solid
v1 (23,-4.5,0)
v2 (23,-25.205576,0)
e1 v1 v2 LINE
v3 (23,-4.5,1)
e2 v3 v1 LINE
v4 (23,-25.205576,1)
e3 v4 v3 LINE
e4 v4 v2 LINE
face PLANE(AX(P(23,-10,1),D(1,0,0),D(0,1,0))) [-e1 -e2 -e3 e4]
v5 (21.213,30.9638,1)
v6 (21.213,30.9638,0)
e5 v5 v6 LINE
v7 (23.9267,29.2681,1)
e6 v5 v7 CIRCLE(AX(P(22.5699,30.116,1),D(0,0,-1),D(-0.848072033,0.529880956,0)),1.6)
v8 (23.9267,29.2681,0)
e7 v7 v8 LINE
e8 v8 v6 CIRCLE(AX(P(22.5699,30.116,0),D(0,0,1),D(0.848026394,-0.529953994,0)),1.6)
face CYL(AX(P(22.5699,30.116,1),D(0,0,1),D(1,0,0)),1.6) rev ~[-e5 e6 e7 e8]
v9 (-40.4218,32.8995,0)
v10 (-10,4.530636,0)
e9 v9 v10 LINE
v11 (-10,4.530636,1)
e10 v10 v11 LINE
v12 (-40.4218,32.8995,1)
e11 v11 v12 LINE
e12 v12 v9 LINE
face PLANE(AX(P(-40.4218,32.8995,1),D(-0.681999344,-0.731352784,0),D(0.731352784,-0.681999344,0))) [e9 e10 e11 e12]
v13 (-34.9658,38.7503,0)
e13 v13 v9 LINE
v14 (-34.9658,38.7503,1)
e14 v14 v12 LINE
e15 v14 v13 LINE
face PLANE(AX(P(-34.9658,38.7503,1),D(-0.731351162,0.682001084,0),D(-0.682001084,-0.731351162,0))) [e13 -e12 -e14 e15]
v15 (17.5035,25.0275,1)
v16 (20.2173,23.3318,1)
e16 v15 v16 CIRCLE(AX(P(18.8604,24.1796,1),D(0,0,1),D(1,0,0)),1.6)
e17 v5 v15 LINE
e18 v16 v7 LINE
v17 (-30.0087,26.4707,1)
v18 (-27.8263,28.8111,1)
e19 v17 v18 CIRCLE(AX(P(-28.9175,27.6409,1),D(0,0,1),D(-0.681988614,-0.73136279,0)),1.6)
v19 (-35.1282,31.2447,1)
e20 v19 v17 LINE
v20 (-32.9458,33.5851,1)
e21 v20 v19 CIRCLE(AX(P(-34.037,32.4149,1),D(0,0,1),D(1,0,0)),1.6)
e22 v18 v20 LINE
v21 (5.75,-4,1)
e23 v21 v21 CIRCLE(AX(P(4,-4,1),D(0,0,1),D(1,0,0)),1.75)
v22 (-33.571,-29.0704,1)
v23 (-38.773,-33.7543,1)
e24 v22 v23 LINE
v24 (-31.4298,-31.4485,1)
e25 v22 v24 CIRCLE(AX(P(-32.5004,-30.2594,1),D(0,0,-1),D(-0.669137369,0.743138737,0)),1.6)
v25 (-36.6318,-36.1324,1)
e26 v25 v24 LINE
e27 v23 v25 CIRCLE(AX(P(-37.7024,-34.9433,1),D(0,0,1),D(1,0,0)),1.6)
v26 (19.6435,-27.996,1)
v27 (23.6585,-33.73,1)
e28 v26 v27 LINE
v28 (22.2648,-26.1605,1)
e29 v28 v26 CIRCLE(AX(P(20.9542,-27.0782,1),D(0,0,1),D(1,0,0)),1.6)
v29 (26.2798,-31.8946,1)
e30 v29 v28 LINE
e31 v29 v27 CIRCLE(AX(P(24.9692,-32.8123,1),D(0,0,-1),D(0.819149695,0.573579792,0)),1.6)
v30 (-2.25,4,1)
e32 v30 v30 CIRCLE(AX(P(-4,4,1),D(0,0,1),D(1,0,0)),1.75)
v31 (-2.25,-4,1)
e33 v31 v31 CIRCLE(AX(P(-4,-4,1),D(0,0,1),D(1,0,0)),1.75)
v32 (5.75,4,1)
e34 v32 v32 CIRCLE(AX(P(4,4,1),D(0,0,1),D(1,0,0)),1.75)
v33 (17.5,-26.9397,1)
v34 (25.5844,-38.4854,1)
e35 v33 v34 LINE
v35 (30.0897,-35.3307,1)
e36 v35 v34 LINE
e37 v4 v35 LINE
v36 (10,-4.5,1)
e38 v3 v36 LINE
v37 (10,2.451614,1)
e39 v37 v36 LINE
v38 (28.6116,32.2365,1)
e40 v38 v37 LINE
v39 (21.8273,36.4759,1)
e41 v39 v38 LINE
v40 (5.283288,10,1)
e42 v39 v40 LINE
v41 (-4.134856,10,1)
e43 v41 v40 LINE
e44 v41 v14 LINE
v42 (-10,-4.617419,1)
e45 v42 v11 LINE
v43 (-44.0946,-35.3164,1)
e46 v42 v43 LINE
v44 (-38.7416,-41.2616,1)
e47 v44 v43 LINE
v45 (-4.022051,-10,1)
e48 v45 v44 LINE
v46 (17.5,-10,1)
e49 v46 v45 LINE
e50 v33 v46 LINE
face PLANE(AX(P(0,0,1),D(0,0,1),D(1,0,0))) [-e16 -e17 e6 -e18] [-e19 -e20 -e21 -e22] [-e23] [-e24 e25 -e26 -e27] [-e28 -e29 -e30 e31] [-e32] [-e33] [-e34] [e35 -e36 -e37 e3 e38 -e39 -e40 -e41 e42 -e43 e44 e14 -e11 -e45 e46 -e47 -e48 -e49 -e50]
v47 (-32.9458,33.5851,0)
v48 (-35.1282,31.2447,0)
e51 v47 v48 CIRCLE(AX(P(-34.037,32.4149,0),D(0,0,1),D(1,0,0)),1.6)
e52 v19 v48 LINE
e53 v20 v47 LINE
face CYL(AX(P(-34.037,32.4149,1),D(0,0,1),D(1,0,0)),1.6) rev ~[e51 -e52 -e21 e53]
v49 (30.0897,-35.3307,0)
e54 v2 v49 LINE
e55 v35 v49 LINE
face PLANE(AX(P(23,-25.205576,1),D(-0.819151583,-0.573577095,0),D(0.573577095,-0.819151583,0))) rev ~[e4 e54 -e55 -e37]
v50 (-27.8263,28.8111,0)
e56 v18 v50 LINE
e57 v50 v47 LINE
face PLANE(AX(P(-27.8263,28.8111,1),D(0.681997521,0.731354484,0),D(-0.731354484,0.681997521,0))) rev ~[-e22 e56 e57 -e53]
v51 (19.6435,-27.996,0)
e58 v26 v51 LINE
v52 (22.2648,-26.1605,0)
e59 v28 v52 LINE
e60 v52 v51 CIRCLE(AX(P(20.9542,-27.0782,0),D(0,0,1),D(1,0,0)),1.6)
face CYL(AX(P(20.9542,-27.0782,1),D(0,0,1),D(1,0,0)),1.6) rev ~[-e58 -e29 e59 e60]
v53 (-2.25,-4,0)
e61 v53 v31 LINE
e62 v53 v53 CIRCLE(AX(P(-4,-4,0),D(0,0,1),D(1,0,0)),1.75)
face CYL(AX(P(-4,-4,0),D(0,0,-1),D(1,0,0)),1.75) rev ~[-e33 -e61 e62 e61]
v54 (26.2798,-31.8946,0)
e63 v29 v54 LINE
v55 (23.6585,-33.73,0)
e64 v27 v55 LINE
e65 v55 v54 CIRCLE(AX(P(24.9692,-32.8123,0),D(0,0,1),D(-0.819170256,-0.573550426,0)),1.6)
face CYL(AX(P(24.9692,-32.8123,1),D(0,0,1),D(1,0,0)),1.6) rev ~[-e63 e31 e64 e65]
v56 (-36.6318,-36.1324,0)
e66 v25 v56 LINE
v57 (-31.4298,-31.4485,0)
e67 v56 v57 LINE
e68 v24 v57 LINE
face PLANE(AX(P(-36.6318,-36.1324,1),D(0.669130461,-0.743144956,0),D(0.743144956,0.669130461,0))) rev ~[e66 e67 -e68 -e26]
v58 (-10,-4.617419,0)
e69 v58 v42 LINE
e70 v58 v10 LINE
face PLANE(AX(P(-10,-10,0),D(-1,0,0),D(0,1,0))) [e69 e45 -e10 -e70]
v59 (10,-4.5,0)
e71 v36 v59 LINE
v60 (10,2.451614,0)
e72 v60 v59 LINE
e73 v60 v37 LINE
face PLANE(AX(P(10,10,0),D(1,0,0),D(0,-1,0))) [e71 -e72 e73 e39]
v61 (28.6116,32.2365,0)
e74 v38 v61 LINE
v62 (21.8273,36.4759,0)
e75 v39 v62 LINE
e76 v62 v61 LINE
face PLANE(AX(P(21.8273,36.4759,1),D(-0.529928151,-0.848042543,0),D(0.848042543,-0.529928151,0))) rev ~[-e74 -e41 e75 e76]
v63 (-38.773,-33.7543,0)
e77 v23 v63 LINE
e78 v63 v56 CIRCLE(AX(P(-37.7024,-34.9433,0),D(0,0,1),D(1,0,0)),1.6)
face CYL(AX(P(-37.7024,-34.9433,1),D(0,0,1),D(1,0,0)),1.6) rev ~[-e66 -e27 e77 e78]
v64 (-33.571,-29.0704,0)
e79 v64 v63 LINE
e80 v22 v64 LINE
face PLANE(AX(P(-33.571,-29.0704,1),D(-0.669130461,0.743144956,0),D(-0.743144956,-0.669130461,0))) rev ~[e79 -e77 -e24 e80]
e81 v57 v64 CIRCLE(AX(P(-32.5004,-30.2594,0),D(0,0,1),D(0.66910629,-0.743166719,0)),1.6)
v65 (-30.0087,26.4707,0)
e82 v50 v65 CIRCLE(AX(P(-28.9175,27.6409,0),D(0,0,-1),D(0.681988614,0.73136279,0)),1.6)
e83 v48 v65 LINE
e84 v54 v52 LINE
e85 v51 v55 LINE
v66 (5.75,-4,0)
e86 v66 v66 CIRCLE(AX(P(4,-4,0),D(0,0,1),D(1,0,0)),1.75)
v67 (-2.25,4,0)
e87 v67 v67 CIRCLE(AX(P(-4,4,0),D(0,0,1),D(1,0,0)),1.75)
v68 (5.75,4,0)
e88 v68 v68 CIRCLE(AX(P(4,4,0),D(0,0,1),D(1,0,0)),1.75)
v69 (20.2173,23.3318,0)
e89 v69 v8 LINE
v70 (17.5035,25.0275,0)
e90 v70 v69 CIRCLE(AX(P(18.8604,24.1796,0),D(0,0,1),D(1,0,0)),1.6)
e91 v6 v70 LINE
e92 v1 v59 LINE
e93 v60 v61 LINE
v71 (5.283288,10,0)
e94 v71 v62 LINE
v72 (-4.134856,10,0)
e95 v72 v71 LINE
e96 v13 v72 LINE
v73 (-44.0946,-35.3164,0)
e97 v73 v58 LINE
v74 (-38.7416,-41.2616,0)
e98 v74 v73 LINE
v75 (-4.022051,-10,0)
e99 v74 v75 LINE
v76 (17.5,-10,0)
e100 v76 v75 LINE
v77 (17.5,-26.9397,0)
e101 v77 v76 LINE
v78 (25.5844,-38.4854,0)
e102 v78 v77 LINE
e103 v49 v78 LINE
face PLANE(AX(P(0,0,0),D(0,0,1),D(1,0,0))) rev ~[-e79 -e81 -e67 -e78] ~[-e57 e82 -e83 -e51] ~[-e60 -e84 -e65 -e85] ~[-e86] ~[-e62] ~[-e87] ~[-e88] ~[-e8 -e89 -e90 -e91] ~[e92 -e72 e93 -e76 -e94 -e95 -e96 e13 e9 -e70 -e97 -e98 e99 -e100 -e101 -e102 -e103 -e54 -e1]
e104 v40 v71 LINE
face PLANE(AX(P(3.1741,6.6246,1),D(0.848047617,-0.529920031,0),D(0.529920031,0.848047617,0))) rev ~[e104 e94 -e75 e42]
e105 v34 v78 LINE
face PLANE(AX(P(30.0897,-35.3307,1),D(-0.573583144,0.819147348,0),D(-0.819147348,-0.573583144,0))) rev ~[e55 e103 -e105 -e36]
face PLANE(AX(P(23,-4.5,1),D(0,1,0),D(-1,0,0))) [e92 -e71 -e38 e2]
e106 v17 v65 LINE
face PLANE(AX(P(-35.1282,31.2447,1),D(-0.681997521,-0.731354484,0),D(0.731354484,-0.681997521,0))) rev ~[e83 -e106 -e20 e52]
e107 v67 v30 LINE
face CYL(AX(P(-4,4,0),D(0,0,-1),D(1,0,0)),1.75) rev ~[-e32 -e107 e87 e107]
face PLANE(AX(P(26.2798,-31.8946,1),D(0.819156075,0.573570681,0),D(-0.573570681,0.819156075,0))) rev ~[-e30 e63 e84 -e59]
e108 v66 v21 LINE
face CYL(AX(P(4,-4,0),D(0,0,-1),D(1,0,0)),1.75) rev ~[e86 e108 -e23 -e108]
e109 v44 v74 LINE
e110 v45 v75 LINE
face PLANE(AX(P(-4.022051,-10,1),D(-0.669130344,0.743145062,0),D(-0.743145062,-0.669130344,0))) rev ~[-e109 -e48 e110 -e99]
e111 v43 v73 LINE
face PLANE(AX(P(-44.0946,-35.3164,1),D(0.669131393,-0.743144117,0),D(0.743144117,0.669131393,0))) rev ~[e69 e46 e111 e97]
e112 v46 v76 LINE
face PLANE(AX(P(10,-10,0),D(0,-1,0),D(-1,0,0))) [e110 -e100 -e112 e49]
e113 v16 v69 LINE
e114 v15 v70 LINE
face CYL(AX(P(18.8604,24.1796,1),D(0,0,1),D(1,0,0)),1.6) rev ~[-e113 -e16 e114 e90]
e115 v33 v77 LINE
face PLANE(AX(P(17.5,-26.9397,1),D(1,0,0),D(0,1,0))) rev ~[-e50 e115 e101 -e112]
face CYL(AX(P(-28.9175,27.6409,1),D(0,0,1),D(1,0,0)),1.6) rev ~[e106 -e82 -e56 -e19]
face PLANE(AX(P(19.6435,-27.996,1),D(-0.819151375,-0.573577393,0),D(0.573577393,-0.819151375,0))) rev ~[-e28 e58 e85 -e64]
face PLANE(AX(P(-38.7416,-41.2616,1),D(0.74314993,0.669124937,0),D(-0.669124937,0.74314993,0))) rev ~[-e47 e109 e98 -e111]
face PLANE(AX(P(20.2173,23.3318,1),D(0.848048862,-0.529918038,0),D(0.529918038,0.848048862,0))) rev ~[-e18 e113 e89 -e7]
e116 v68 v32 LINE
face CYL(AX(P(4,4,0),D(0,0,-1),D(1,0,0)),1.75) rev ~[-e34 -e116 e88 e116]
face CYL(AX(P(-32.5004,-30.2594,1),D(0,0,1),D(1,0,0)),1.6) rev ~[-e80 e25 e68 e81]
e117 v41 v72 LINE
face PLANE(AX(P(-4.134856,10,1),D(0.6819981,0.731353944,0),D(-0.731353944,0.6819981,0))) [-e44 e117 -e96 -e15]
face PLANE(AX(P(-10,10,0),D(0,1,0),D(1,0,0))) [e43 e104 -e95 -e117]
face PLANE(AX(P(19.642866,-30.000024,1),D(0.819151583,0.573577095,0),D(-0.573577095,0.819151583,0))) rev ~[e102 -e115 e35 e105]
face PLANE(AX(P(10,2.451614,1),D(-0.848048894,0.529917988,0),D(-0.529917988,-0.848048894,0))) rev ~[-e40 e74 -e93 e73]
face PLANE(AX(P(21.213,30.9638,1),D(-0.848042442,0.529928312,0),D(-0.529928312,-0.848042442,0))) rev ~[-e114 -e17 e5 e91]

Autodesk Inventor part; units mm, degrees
ref_plane "YZ Plane" through (0, 0, 0) normal (1, 0, 0) x (0, 1, 0)
ref_plane "XZ Plane" through (0, 0, 0) normal (0, 1, 0) x (-1, 0, 0)
ref_plane "XY Plane" through (0, 0, 0) normal (0, 0, 1) x (1, 0, 0)
sketch "Sketch1" plane through (0, 0, 0) normal (0, 0, 1) x (1, 0, 0)
  line L0 (-10, 10) -> (10, 10)
  line L1 (10, 10) -> (10, -10)
  line L2 (10, -10) -> (-10, -10)
  line L3 (-10, -10) -> (-10, 10)
  line L4 (-10, 10) -> (10, -10) construction
  line L5 (10, 10) -> (-10, -10) construction
  circle A0 centre (-4, 4) radius 1.75
  line L6 (-4, 4) -> (0.2191, 4)
  line L7 (0.2191, 4) -> (0.2191, 2.6146)
  circle A1 centre (4, 4) radius 1.75
  circle A2 centre (-4, -4) radius 1.75
  circle A3 centre (4, -4) radius 1.75
  point P0 (0, 0)
  dimension "d0" = 20
  dimension "d1" = 20
  dimension "d2" = 3.5
  dimension "d5" = 8
  dimension "d8" = 8
  dimension "d11" = 4
  dimension "d12" = 4
extrude "Plate1" add sketch "Sketch1" along normal blind 1
sketch "Sketch2" plane through (0, 0, 1) normal (0, 0, 1) x (1, 0, 0)
  line L0 (-10, -10) -> (-10, 10)
  line L1 (-10, 10) -> (-33.9394, 32.3238)
  line L2 (-10, -10) -> (-37.6112, -34.8612)
  line L3 (-10, 10) -> (10, 10)
  line L4 (10, 10) -> (17.9255, 22.6834)
  line L5 (10, -10) -> (-10, -10)
  line L6 (-40.4218, 32.8995) -> (-8.9736, 3.5735)
  line L7 (-8.9736, 3.5735) -> (-3.5176, 9.4244)
  line L8 (-3.5176, 9.4244) -> (-34.9658, 38.7503)
  line L9 (-34.9658, 38.7503) -> (-40.4218, 32.8995)
  line L10 (-40.4218, 32.8995) -> (-3.5176, 9.4244) construction
  line L11 (-8.9736, 3.5735) -> (-34.9658, 38.7503) construction
  line L12 (10, 10) -> (10, -10)
  line L13 (-44.0946, -35.3164) -> (-8.8696, -3.5996)
  line L14 (-8.8696, -3.5996) -> (-3.5165, -9.5448)
  line L15 (-3.5165, -9.5448) -> (-38.7416, -41.2616)
  line L16 (-38.7416, -41.2616) -> (-44.0946, -35.3164)
  line L17 (-44.0946, -35.3164) -> (-3.5165, -9.5448) construction
  line L18 (-8.8696, -3.5996) -> (-38.7416, -41.2616) construction
  line L19 (28.6116, 32.2365) -> (9.9585, 2.3852)
  line L20 (9.9585, 2.3852) -> (3.1741, 6.6246)
  line L21 (3.1741, 6.6246) -> (21.8273, 36.4759)
  line L22 (21.8273, 36.4759) -> (28.6116, 32.2365)
  line L23 (28.6116, 32.2365) -> (3.1741, 6.6246) construction
  line L24 (9.9585, 2.3852) -> (21.8273, 36.4759) construction
  line L25 (23, -4.5) -> (10, -4.5)
  line L26 (10, -4.5) -> (10, -10)
  line L27 (10, -10) -> (23, -10)
  line L28 (23, -10) -> (23, -4.5)
  line L29 (23, -4.5) -> (10, -10) construction
  line L30 (10, -4.5) -> (23, -10) construction
  line L31 (17.5, -26.9397) -> (17.5, -10)
  line L32 (17.5, -10) -> (23, -10)
  line L33 (23, -10) -> (23, -30)
  line L34 (23, -30) -> (19.6429, -30)
  line L35 (16.1337, -34.9685) -> (23, -10) construction
  line L36 (17.5, -10) -> (23, -30) construction
  line L37 (25.5844, -38.4854) -> (17.5, -26.9397)
  line L38 (17.5, -26.9397) -> (22.0053, -23.785)
  line L39 (22.0053, -23.785) -> (30.0897, -35.3307)
  line L40 (30.0897, -35.3307) -> (25.5844, -38.4854)
  line L41 (25.5844, -38.4854) -> (22.0053, -23.785) construction
  line L42 (17.5, -26.9397) -> (30.0897, -35.3307) construction
  line L43 (23, -30) -> (23.7949, -31.1352)
  point P0 (0, 0)
  point P1 (-21.9697, 21.1619)
  point P2 (-23.8056, -22.4306)
  point P3 (15.8929, 19.4306)
  point P4 (16.5, -7.25)
  point P5 (20.25, -20)
  dimension "d14" = 137
  dimension "d15" = 138
  dimension "d17" = 148
  dimension "d18" = 8
  dimension "d19" = 8
  dimension "d21" = 8
  dimension "d22" = 42.5
  dimension "d23" = 7.3
  dimension "d24" = 9
  dimension "d25" = 9
  dimension "d28" = 56.4
  dimension "d29" = 52
  dimension "d35" = 5.5
  dimension "d36" = 5.5
  dimension "d38" = 13
  dimension "d39" = 20
  dimension "d41" = 5.5
  dimension "d42" = 145
  dimension "d43" = 46.2
sheet face with bend "Face2" sketch "Sketch2" thickness 1 toward (0, 0, -1) bend radius 1 contours L5 L15 L16 L13 L0 | L0 L13 L14 L15 L5 | L6 L9 L8 L3 L0 | L0 L3 L8 L7 L6 | L12 L25 L28 L27 | L27 L33 L39 L38 L31 | L19 L20 L21 L3 L12 | L12 L3 L21 L22 L19 | L38 L39 L33 L34 L37 | L39 L40 L37 L34 L33
bend "Bend1"
sketch "Sketch4" plane through (0, 0, 1) normal (0, 0, 1) x (1, 0, 0)
  circle A0 centre (-32.5004, -30.2594) radius 1.6
  circle A1 centre (-37.7024, -34.9433) radius 1.6
  circle A2 centre (-34.037, 32.4149) radius 1.6
  circle A3 centre (-28.9175, 27.6409) radius 1.6
  circle A4 centre (22.5699, 30.116) radius 1.6
  circle A5 centre (18.8604, 24.1796) radius 1.6
  line L0 (-34.037, 32.4149) -> (-28.9175, 27.6409)
  line L1 (22.5699, 30.116) -> (18.8604, 24.1796)
  line L2 (-37.7024, -34.9433) -> (-32.5004, -30.2594)
  line L3 (20.9542, -27.0782) -> (24.9692, -32.8123)
  line L4 (30.0897, -35.3307) -> (23, -25.2055) projected
  circle A6 centre (20.9542, -27.0782) radius 1.6
  circle A7 centre (24.9692, -32.8123) radius 1.6
  line L5 (25.5844, -38.4854) -> (30.0897, -35.3307) projected
  line L6 (28.6116, 32.2365) -> (10, 2.4517) projected
  line L7 (-4.1349, 10) -> (-34.9658, 38.7503) projected
  line L8 (-44.0946, -35.3164) -> (-10, -4.6175) projected
  line L9 (-38.7416, -41.2616) -> (-44.0946, -35.3164) projected
  line L10 (21.8273, 36.4759) -> (28.6116, 32.2365) projected
  line L11 (-34.9658, 38.7503) -> (-40.4218, 32.8995) projected
  line L12 (-37.7024, -34.9433) -> (-32.5004, -30.2594) construction
  line L13 (-36.6318, -36.1324) -> (-31.4298, -31.4485)
  line L14 (-33.571, -29.0704) -> (-38.773, -33.7543)
  arc A8 (-38.773, -33.7543) -> (-36.6318, -36.1324) centre (-37.7024, -34.9433) ccw
  arc A9 (-31.4298, -31.4485) -> (-33.571, -29.0704) centre (-32.5004, -30.2594) ccw
  line L15 (20.9542, -27.0782) -> (24.9692, -32.8123) construction
  line L16 (19.6435, -27.996) -> (23.6585, -33.73)
  line L17 (26.2798, -31.8946) -> (22.2648, -26.1605)
  arc A10 (22.2648, -26.1605) -> (19.6435, -27.996) centre (20.9542, -27.0782) ccw
  arc A11 (23.6585, -33.73) -> (26.2798, -31.8946) centre (24.9692, -32.8123) ccw
  line L18 (18.8604, 24.1796) -> (22.5699, 30.116) construction
  line L19 (20.2173, 23.3318) -> (23.9267, 29.2681)
  line L20 (21.213, 30.9638) -> (17.5035, 25.0275)
  arc A12 (17.5035, 25.0275) -> (20.2173, 23.3318) centre (18.8604, 24.1796) ccw
  arc A13 (23.9267, 29.2681) -> (21.213, 30.9638) centre (22.5699, 30.116) ccw
  line L21 (-28.9175, 27.6409) -> (-34.037, 32.4149) construction
  line L22 (-27.8263, 28.8111) -> (-32.9458, 33.5851)
  line L23 (-35.1282, 31.2447) -> (-30.0087, 26.4707)
  arc A14 (-30.0087, 26.4707) -> (-27.8263, 28.8111) centre (-28.9175, 27.6409) ccw
  arc A15 (-32.9458, 33.5851) -> (-35.1282, 31.2447) centre (-34.037, 32.4149) ccw
  point P0 (0, 0)
  point P1 (-35.1014, -32.6014)
  point P2 (22.9617, -29.9453)
  point P3 (20.7151, 27.1478)
  point P4 (-31.4773, 30.0279)
  dimension "d54" = 2.75
  dimension "d55" = 3.2
  dimension "d56" = 3.2
  dimension "d58" = 5
  dimension "d59" = 7
  dimension "d60" = 3.2
  dimension "d61" = 3.2
  dimension "d62" = 3.2
  dimension "d63" = 3.2
  dimension "d64" = 3.2
  dimension "d65" = 3.2
  dimension "d66" = 8
  dimension "d67" = 8
  dimension "d68" = 8
  dimension "d69" = 5
  dimension "d70" = 7
  dimension "d71" = 5
  dimension "d72" = 7
  dimension "d73" = 5
  dimension "d74" = 7
extrude "Cut1" cut sketch "Sketch4" against normal blind 1
sketch "Sketch3" plane through (-41.7142, -43.9381, 0) normal (-0.7431448, -0.6691306, 0) x (0.6691306, -0.7431448, 0)
  line L0 (-8, 0) -> (0, 0)
  line L1 (0, 0) -> (0, 25)
  line L2 (0, 25) -> (-8, 25)
  line L3 (-8, 25) -> (-8, 0)
equation "\"d75\" = 厚度"
equation "\"d13\" = 厚度"
equation "\"d30\" = 折彎半徑"
equation "\"d31\" = 折彎離隙寬度"
equation "\"d33\" = 最小剩餘"
equation "\"d32\" = 折彎離隙深度"
equation "\"d34\" = 轉移半徑"
equation "\"折彎半徑\" = 厚度"
equation "\"折彎離隙寬度\" = 厚度"
equation "\"折彎離隙深度\" = 0.5 * 厚度"
equation "\"轉角離隙大小\" = 4 * 厚度"
equation "\"最小剩餘\" = 2 * 厚度"
equation "\"轉移半徑\" = 折彎半徑"
equation "\"Jacobi半徑大小\" = 折彎半徑"
equation "\"間隙大小\" = 厚度"
equation "\"厚度\" = 1"
properties part number "watercooler_fixed2"
